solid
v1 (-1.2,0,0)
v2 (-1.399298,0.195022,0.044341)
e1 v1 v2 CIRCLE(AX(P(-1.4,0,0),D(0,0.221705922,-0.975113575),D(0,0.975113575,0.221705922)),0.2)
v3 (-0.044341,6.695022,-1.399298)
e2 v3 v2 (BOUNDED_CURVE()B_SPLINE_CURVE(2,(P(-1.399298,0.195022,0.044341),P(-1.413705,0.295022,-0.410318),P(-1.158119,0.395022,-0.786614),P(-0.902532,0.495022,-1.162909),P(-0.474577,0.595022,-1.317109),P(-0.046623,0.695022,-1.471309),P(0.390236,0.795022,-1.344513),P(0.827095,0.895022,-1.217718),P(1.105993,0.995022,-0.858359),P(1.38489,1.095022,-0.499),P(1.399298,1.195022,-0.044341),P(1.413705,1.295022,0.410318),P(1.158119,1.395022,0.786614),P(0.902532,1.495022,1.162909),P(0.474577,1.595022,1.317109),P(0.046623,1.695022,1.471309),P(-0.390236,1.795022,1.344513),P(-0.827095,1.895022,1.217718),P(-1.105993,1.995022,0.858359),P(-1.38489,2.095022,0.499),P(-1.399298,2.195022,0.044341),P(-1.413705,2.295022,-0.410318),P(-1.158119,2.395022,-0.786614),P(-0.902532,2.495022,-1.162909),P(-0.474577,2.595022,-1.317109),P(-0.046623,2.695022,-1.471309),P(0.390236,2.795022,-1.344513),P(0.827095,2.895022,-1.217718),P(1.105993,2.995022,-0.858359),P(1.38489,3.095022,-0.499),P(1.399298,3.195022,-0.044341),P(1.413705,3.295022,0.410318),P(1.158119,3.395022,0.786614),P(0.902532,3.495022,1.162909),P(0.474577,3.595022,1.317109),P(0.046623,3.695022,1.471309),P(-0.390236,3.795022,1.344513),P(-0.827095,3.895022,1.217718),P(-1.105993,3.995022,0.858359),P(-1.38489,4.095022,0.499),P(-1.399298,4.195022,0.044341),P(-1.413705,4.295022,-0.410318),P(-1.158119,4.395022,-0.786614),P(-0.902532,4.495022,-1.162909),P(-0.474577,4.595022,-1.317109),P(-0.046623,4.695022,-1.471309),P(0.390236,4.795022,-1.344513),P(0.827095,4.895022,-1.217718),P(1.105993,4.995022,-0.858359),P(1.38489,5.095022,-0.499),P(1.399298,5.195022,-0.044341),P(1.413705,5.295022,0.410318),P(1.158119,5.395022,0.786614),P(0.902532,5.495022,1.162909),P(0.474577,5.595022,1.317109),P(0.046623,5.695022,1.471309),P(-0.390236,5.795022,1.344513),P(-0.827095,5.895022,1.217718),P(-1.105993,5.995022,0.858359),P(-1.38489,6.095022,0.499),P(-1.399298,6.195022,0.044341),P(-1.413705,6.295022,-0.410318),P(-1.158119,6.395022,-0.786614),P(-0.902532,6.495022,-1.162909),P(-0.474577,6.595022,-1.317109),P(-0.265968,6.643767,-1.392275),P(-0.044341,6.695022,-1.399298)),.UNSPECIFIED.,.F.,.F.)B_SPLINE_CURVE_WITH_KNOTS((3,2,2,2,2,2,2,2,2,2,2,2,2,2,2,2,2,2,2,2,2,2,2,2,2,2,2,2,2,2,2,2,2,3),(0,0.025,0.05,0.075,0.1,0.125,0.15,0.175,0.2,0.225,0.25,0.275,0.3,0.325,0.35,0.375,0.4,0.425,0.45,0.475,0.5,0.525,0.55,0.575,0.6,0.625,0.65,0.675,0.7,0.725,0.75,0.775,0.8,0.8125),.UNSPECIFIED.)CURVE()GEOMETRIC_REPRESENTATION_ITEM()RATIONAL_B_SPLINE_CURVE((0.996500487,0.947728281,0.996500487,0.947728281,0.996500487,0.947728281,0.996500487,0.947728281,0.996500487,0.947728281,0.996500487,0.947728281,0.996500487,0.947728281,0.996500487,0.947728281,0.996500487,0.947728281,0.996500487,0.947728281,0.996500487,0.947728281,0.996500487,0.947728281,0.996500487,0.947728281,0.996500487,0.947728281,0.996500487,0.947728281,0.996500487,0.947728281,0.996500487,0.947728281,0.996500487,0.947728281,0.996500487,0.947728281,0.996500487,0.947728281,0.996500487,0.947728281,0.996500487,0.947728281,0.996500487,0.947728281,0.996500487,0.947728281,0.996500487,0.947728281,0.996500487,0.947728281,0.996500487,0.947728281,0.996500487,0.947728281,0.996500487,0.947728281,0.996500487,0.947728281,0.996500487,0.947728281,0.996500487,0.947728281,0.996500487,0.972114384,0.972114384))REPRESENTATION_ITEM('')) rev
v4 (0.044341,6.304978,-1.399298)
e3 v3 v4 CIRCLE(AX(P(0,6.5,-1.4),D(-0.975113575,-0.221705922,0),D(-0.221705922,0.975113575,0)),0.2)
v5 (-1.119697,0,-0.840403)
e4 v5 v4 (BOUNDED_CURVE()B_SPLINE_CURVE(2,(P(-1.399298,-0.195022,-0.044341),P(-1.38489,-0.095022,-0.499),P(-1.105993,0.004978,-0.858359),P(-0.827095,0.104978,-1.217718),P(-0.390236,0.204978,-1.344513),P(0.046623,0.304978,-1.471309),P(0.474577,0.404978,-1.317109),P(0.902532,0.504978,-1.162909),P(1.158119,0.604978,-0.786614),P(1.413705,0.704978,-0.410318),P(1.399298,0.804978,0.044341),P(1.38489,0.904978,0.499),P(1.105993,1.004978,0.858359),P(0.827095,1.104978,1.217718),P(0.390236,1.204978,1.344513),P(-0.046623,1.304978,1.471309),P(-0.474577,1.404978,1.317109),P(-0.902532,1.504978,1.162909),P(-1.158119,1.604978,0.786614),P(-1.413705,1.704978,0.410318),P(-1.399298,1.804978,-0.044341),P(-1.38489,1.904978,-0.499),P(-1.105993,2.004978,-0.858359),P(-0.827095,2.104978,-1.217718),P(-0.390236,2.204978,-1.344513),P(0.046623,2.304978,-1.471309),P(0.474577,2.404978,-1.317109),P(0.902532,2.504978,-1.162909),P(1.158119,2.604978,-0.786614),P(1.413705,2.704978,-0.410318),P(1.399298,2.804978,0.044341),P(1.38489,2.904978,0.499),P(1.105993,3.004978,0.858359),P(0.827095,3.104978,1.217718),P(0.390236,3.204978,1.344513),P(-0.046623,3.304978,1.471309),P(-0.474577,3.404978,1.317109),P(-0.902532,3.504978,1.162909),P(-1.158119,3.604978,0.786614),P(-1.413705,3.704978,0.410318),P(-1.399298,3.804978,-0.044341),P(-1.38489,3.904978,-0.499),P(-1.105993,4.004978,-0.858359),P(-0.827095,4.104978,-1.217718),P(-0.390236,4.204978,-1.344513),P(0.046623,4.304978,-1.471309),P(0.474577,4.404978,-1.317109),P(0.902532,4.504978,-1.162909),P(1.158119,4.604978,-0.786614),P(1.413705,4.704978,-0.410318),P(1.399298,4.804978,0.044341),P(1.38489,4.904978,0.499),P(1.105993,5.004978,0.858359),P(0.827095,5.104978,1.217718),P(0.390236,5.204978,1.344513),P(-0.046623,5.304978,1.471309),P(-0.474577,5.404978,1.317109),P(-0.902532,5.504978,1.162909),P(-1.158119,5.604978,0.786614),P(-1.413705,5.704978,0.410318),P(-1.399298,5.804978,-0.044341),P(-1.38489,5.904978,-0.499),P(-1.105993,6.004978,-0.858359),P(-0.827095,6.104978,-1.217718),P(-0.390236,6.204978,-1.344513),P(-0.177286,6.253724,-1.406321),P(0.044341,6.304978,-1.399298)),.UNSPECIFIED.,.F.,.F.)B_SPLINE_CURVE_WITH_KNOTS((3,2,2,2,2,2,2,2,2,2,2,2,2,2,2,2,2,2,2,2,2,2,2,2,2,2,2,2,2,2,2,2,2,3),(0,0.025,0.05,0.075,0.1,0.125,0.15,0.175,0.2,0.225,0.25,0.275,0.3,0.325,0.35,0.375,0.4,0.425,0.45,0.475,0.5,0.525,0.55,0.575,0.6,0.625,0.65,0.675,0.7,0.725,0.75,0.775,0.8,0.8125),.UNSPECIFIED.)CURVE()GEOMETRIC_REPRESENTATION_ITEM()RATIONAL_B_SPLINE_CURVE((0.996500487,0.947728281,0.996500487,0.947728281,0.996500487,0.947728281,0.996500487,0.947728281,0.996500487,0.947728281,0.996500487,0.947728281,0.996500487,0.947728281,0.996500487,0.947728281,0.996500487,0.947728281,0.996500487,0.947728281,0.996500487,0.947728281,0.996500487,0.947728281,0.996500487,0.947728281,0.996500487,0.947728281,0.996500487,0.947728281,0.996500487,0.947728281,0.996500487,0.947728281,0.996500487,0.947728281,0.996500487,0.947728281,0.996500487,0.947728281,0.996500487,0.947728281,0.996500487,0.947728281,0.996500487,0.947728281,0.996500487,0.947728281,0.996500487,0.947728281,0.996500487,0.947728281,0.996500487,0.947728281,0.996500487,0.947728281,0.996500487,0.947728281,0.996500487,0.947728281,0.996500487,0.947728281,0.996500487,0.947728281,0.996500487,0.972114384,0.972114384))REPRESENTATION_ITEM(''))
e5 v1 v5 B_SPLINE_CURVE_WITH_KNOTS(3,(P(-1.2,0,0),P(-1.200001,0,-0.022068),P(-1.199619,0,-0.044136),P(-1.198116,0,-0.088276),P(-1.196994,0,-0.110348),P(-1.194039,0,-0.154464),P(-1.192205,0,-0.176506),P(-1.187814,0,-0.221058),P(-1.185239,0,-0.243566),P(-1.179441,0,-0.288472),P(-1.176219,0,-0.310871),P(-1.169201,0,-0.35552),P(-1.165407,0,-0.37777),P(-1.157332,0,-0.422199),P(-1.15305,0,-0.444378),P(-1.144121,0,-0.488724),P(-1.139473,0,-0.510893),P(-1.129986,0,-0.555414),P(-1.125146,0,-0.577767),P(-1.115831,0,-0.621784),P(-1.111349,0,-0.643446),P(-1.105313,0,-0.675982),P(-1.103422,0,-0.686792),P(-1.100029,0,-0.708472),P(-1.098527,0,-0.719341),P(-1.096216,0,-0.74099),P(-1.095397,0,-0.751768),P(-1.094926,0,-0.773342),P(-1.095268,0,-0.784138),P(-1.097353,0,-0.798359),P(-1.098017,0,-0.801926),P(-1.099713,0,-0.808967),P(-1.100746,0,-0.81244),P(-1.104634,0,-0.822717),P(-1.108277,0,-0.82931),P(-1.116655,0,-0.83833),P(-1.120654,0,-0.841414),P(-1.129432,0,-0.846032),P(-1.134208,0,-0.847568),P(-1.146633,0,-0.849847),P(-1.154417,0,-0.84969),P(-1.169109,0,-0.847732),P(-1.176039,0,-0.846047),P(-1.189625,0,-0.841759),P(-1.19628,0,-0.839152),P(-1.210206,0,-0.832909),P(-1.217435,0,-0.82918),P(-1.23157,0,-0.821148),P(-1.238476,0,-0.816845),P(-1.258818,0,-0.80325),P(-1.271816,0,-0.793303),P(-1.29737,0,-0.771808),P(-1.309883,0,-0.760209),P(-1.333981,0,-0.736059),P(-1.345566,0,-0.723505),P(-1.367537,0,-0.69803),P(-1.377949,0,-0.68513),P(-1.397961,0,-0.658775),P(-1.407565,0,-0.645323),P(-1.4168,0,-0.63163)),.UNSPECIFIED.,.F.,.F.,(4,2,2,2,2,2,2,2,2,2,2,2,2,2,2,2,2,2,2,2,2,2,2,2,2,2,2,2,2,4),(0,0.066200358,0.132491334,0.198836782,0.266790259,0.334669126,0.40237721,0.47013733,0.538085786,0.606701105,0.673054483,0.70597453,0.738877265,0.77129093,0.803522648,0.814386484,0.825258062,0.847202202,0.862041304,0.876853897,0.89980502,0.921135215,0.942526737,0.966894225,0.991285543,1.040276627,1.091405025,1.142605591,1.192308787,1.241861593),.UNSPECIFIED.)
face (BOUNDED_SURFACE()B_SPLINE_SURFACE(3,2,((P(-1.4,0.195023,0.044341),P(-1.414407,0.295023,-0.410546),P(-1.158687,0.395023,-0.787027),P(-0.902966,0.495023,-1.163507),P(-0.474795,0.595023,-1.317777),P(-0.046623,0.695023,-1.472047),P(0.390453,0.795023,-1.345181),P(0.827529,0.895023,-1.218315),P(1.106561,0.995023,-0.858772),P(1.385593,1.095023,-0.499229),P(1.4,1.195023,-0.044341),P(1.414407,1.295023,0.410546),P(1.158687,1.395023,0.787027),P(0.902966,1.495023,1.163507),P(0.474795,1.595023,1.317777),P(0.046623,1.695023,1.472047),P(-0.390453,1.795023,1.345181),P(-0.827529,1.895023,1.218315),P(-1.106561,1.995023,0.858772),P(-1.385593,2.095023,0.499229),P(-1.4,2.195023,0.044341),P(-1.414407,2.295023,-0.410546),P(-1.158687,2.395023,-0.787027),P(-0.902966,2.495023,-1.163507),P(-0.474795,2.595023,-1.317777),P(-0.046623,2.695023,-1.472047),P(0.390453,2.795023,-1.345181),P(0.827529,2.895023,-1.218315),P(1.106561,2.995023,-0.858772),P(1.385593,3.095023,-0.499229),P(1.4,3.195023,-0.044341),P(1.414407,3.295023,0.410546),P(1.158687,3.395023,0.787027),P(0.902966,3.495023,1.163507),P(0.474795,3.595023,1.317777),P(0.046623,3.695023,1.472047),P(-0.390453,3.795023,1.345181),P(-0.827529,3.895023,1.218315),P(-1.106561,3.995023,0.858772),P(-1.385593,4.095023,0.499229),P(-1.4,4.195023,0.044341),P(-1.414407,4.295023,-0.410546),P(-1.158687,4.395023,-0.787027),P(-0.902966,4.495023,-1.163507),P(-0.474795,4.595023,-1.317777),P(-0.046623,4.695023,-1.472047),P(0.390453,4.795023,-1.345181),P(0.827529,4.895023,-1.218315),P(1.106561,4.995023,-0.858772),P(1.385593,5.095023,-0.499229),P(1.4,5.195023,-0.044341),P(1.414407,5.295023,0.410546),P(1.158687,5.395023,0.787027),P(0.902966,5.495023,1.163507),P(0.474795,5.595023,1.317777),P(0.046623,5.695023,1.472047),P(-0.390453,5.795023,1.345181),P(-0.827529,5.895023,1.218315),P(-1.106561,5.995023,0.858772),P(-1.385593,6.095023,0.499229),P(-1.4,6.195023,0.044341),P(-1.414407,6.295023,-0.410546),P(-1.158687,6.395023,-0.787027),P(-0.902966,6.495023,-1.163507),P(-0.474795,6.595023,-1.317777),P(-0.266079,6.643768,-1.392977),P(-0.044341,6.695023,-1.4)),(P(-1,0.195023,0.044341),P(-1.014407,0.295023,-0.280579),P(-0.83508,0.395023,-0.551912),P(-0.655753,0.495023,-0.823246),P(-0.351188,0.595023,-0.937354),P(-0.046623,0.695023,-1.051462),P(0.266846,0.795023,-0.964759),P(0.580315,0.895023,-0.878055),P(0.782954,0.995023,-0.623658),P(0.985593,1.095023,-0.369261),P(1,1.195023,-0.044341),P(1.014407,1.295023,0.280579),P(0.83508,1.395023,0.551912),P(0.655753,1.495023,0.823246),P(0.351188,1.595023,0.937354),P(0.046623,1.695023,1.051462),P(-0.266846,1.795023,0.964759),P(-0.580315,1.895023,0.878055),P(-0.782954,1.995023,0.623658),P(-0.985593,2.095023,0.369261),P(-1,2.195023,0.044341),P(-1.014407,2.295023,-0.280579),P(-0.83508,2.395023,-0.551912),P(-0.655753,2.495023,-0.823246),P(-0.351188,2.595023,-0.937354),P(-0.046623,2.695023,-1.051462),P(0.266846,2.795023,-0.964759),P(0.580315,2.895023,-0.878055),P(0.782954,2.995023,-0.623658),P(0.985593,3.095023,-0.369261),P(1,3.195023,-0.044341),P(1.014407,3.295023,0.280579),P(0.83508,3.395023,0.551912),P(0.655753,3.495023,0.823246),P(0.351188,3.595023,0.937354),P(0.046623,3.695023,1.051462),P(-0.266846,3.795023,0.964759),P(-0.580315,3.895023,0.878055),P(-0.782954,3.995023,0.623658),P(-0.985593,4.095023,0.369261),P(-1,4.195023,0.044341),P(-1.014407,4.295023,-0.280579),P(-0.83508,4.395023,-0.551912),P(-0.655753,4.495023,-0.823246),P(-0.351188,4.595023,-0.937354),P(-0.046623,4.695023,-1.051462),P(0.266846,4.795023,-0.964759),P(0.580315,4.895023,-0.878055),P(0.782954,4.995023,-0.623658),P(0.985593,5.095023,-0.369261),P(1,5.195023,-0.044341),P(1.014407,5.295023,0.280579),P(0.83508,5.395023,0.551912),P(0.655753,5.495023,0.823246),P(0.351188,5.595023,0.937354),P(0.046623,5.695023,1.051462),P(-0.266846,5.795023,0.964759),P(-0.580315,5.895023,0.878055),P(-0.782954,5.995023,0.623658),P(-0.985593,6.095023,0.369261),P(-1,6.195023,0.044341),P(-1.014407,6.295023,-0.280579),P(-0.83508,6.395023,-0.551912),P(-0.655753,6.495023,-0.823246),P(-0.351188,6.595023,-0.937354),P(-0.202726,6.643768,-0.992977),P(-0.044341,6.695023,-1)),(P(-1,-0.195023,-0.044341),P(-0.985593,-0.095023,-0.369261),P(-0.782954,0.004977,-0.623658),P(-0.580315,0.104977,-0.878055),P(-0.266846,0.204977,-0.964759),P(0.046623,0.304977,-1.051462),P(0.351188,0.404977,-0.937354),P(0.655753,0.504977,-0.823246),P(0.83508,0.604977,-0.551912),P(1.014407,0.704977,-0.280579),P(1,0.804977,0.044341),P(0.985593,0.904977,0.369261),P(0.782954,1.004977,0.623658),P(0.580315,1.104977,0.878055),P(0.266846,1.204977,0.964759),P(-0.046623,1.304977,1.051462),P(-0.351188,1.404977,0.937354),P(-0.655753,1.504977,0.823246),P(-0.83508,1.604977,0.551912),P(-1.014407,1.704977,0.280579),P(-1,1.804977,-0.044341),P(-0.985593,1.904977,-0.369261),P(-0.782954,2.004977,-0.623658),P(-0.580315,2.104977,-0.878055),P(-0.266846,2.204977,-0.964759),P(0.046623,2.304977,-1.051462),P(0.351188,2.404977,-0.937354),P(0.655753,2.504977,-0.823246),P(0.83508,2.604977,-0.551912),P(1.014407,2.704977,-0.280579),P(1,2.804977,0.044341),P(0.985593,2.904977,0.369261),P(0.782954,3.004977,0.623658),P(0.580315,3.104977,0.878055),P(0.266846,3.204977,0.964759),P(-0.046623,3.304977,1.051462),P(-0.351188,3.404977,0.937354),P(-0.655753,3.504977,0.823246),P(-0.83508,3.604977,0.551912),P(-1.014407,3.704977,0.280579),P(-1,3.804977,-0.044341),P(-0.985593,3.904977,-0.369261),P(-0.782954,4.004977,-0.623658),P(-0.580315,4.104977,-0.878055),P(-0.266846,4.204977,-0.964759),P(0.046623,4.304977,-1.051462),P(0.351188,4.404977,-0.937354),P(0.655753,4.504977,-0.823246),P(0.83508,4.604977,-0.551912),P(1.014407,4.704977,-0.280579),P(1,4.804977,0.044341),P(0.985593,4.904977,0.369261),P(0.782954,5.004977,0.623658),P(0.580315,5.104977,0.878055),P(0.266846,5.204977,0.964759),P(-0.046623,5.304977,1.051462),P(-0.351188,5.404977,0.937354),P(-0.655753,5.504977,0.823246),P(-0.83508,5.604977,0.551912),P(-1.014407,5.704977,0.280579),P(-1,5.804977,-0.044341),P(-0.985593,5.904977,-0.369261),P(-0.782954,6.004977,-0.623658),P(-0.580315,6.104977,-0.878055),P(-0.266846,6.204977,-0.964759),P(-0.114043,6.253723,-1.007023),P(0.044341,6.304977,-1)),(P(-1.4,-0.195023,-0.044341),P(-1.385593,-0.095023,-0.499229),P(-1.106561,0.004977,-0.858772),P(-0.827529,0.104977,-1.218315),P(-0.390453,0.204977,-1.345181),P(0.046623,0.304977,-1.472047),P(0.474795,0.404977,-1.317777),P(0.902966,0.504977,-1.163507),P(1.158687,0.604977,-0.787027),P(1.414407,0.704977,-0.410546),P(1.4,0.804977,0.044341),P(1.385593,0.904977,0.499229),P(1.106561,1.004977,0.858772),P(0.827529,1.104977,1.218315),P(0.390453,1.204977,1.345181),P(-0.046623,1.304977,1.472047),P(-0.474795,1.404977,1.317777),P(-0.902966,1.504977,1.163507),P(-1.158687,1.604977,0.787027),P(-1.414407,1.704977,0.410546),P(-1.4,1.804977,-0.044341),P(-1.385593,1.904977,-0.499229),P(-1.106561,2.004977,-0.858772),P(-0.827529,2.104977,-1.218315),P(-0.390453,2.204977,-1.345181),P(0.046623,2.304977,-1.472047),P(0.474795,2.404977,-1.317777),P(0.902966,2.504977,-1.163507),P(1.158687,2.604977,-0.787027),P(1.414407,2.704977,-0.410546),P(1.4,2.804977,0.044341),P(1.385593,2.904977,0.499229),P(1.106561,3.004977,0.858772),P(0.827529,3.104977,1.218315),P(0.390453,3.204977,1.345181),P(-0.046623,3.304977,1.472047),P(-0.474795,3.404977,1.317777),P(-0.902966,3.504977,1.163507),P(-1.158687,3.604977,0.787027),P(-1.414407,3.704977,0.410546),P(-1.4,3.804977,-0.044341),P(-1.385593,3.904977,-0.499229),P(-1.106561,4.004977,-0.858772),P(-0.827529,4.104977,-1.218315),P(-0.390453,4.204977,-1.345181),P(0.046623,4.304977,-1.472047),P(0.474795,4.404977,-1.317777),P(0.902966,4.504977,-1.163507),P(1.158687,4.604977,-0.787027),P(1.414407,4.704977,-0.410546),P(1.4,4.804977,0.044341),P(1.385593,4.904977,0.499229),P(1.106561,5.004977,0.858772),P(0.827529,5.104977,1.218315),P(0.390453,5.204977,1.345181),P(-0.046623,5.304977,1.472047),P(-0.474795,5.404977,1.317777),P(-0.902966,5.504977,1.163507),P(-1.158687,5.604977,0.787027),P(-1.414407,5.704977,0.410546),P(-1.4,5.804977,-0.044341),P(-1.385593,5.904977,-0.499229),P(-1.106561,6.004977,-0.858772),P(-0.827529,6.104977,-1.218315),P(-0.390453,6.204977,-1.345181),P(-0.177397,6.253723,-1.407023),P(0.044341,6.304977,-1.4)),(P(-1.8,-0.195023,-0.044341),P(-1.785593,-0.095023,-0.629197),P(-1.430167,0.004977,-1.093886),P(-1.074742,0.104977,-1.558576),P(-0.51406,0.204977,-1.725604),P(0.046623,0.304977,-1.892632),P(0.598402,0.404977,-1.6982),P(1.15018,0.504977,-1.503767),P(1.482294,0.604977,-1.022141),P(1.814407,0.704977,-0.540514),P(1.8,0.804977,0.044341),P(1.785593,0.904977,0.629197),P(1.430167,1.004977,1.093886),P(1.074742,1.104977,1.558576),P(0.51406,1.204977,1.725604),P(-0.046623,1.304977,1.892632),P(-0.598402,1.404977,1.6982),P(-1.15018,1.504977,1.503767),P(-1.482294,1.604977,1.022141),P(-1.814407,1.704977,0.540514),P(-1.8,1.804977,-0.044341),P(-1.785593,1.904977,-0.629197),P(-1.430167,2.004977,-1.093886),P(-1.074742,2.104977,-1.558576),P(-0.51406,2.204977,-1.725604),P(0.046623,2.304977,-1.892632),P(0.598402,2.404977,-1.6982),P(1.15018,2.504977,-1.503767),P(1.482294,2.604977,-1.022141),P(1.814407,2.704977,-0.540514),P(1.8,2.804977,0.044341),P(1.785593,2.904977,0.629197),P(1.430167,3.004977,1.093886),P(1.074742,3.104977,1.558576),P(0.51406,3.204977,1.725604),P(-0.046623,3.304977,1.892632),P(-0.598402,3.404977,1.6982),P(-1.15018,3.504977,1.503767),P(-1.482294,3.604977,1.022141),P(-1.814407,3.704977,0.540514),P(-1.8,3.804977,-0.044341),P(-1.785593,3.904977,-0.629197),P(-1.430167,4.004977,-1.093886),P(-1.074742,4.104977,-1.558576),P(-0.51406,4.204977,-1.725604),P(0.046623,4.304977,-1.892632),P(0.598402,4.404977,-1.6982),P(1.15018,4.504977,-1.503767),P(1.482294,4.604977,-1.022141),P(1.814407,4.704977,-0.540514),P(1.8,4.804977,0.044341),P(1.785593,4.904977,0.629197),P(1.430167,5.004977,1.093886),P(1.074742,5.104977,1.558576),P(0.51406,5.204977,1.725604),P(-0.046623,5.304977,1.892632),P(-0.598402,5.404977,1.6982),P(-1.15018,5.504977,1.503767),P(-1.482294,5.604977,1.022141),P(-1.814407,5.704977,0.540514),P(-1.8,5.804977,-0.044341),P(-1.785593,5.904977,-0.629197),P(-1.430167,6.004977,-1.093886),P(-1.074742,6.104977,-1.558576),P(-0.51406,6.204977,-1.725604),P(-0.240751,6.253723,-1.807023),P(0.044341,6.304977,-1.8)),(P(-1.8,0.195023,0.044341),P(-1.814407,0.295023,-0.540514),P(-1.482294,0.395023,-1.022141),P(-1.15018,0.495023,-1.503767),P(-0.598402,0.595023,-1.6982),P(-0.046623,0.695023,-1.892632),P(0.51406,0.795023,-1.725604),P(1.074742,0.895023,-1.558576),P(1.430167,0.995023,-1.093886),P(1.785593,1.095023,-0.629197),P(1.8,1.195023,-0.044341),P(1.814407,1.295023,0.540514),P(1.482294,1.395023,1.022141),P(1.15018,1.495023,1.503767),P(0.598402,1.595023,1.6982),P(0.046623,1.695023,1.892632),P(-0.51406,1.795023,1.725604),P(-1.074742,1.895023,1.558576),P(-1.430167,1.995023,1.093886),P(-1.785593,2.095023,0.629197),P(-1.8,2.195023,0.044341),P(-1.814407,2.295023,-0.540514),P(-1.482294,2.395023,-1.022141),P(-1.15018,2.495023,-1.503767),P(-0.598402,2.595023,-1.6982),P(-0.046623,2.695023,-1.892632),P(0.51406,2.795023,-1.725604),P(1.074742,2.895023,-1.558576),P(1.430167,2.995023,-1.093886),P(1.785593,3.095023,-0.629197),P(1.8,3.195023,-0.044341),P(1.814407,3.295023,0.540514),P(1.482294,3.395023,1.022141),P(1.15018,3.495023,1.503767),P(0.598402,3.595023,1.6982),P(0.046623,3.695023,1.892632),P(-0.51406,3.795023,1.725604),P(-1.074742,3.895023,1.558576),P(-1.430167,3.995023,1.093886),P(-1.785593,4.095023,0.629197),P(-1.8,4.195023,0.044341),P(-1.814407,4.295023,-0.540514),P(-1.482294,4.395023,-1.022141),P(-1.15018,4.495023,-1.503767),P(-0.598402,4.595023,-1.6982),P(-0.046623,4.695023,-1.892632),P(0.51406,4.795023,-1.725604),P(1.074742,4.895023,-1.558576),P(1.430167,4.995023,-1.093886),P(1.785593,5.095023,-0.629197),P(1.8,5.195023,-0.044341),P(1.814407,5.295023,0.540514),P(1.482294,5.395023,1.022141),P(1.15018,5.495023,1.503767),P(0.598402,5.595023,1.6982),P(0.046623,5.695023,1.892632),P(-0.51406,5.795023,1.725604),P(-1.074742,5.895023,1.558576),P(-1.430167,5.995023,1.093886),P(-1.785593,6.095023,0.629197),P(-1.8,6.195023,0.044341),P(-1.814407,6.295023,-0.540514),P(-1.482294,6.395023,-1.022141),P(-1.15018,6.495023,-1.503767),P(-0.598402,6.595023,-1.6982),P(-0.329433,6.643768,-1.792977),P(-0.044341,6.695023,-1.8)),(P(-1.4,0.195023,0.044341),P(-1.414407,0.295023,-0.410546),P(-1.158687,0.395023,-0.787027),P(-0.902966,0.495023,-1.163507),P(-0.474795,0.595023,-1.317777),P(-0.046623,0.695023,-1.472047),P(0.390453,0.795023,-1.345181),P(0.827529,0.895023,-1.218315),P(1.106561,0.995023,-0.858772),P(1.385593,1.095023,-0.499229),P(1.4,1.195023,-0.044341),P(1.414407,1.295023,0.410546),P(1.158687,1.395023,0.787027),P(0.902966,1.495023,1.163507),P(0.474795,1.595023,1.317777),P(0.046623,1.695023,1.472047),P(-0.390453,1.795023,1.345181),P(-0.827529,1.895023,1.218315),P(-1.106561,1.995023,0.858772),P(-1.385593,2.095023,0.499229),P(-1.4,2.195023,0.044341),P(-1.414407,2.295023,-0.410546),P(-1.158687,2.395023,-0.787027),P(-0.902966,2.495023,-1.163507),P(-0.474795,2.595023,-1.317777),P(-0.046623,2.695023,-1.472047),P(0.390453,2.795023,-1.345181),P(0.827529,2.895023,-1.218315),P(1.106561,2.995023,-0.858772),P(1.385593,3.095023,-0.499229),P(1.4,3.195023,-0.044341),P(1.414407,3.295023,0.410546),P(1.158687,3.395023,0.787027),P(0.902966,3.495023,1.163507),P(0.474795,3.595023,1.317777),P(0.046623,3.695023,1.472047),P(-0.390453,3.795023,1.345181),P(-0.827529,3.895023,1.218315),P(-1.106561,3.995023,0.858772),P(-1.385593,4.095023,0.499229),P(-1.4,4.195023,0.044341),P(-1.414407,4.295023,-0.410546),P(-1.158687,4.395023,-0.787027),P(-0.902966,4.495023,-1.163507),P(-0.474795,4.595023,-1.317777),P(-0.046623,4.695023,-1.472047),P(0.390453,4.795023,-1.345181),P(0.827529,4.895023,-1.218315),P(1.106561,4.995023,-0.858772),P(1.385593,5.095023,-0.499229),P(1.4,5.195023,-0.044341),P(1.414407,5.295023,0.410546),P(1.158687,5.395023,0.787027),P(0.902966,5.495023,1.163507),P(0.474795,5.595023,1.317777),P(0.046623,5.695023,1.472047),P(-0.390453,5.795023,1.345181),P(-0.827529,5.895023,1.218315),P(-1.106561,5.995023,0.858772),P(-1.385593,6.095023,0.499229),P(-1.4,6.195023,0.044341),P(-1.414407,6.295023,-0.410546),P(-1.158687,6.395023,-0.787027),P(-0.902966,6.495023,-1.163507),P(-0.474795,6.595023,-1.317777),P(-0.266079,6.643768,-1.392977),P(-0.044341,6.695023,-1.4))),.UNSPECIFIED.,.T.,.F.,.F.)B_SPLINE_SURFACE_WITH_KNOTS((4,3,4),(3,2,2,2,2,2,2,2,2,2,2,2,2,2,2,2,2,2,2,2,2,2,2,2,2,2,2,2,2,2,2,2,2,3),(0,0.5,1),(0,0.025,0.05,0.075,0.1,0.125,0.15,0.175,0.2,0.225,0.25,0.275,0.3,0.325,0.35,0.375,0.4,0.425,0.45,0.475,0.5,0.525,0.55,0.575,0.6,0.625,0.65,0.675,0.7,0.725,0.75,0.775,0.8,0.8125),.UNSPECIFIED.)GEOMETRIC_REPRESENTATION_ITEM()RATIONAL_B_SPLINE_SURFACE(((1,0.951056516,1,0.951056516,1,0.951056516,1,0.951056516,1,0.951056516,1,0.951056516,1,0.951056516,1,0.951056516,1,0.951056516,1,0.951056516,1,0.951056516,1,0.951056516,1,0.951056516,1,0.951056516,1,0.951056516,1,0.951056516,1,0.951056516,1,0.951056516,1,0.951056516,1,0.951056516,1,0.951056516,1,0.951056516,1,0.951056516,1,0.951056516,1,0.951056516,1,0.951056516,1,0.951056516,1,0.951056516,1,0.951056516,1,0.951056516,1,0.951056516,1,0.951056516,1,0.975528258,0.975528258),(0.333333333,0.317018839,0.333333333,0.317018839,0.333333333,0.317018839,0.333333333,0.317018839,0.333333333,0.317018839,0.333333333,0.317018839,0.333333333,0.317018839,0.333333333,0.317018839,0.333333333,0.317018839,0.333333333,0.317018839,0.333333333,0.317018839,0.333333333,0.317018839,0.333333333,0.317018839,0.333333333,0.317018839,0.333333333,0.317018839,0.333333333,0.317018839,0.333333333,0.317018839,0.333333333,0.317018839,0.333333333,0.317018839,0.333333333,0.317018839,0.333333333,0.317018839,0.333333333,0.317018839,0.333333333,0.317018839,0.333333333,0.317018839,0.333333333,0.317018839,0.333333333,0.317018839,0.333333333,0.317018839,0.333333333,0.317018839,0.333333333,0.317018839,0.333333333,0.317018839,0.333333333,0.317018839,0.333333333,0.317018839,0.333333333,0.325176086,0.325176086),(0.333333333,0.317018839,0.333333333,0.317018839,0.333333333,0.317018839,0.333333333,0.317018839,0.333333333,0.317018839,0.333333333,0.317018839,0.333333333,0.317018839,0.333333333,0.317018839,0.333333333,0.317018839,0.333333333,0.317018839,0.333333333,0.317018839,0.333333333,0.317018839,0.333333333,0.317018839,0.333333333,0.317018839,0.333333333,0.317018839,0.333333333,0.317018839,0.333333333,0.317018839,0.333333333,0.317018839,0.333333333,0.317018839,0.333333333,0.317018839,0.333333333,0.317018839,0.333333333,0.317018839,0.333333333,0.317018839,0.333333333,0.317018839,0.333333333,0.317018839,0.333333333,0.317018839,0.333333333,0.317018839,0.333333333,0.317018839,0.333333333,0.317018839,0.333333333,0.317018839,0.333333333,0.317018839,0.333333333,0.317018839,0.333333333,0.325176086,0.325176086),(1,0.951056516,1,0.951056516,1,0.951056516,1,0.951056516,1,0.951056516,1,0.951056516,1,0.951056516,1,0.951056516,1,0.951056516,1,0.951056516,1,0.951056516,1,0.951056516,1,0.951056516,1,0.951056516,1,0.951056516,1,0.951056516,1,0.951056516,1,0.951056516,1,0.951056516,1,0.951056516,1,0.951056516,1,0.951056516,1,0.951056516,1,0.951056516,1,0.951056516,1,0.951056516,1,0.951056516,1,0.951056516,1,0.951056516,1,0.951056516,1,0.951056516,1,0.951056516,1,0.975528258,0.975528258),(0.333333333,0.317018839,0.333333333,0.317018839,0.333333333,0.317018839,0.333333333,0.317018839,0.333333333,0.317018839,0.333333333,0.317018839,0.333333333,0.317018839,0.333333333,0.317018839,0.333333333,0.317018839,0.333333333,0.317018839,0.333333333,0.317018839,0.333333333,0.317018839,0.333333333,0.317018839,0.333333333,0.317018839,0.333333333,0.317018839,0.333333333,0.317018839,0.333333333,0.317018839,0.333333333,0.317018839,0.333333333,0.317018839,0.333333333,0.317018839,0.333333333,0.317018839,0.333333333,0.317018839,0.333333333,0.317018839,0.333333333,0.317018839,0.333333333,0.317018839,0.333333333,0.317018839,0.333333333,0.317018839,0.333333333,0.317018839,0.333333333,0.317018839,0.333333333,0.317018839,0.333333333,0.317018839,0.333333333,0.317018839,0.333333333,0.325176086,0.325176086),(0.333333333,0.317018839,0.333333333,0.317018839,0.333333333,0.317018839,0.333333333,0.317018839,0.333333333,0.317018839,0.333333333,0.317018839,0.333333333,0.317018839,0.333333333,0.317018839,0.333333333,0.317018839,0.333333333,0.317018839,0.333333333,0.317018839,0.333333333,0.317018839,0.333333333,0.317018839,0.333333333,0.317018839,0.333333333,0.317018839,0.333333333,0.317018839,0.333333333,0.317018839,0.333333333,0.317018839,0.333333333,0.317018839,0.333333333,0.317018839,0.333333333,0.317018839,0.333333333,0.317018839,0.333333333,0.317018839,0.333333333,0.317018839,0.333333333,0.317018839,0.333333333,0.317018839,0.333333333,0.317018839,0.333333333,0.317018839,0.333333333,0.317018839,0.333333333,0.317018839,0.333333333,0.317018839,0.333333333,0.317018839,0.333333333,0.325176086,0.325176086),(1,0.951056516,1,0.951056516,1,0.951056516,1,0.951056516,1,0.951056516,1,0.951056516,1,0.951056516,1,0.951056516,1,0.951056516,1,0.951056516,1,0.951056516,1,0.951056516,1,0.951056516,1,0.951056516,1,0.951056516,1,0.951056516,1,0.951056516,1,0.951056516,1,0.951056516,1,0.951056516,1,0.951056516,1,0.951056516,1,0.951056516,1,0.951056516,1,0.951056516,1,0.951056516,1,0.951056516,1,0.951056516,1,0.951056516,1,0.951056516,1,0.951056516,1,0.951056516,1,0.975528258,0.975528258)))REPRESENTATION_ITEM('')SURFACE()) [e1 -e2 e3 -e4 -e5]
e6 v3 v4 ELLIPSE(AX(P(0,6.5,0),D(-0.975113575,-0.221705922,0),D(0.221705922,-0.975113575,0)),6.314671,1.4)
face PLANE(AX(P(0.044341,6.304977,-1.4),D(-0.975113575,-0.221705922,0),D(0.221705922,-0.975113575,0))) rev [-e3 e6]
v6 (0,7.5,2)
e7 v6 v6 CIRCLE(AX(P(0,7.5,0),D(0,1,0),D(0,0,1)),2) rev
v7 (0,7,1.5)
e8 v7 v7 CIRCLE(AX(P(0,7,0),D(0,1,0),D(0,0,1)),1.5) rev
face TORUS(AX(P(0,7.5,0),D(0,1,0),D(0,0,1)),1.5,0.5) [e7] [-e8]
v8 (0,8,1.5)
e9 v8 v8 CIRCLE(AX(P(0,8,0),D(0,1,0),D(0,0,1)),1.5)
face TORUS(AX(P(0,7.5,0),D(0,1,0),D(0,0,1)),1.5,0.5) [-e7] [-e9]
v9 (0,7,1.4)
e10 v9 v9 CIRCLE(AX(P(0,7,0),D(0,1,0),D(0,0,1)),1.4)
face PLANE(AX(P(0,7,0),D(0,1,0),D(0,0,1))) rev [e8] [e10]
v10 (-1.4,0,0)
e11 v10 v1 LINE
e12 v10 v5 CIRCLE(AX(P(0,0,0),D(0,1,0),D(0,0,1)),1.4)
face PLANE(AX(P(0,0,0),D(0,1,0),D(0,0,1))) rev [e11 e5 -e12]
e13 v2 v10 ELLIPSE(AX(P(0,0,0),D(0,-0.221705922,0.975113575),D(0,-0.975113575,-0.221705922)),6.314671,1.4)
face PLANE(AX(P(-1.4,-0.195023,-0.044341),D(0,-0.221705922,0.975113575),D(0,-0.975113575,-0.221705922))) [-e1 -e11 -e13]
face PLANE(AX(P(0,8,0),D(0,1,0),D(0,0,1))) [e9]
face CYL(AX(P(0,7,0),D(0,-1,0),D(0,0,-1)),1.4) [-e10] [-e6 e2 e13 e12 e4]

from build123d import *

# Parameters (mm, degrees)
SKETCH1_R           = 1.4
BOSS_EXTRUDE1_DEPTH = 7
SKETCH2_R           = 2
BOSS_EXTRUDE2_DEPTH = 1
FILLET3_R           = 0.5
SWEEP1_PITCH        = 2
SWEEP1_HEIGHT       = 6.5
SWEEP1_RADIUS       = 1.4
SWEEP1_START_ANGLE  = -90
SWEEP1_PROFILE_R    = 0.2


with BuildPart() as part:
    # Sketch1 → Boss-Extrude1 (new body)
    with BuildSketch(Plane(origin=(0, 0, 0), x_dir=(1, 0, 0), z_dir=(0, 1, 0))):
        with Locations(Location((0, 0, 0), (0, 0, 270))):
            Circle(SKETCH1_R)
    extrude(amount=BOSS_EXTRUDE1_DEPTH)

    # Sketch2 → Boss-Extrude2 (add)
    with BuildSketch(Plane(origin=(0, 7, 0), x_dir=(1, 0, 0), z_dir=(0, 1, 0))):
        with Locations(Location((0, 0, 0), (0, 0, 270))):
            Circle(SKETCH2_R)
    extrude(amount=BOSS_EXTRUDE2_DEPTH)

    # Fillet3
    fillet3_edges = [part.edges().sort_by_distance(p)[0] for p in [
        (0, 7, -2),
        (0, 8, -2),
    ]]
    fillet(fillet3_edges, radius=FILLET3_R - 0.0001)  # a hair under: the kernel refuses the full size

    # Sweep1: sweep along a helix
    with BuildLine() as sweep1_path:
        add(Helix(SWEEP1_PITCH, SWEEP1_HEIGHT, SWEEP1_RADIUS, center=(0, 0, 0), direction=(0, 1, 0), lefthand=True, mode=Mode.PRIVATE).rotate(Axis((0, 0, 0), (0, 1, 0)), SWEEP1_START_ANGLE))
    # Sweep1 profile (on start of the path) → Sweep1 (sweep)
    with BuildSketch(Plane(origin=(-1.4, 0, 0), x_dir=(0, -0.9751135749579573, -0.22170592218682939), z_dir=(-2.894606634846599e-14, 0.22170592218682939, -0.9751135749579573))):
        Circle(SWEEP1_PROFILE_R)
    sweep(path=sweep1_path.line, is_frenet=True)


solid = part.part
